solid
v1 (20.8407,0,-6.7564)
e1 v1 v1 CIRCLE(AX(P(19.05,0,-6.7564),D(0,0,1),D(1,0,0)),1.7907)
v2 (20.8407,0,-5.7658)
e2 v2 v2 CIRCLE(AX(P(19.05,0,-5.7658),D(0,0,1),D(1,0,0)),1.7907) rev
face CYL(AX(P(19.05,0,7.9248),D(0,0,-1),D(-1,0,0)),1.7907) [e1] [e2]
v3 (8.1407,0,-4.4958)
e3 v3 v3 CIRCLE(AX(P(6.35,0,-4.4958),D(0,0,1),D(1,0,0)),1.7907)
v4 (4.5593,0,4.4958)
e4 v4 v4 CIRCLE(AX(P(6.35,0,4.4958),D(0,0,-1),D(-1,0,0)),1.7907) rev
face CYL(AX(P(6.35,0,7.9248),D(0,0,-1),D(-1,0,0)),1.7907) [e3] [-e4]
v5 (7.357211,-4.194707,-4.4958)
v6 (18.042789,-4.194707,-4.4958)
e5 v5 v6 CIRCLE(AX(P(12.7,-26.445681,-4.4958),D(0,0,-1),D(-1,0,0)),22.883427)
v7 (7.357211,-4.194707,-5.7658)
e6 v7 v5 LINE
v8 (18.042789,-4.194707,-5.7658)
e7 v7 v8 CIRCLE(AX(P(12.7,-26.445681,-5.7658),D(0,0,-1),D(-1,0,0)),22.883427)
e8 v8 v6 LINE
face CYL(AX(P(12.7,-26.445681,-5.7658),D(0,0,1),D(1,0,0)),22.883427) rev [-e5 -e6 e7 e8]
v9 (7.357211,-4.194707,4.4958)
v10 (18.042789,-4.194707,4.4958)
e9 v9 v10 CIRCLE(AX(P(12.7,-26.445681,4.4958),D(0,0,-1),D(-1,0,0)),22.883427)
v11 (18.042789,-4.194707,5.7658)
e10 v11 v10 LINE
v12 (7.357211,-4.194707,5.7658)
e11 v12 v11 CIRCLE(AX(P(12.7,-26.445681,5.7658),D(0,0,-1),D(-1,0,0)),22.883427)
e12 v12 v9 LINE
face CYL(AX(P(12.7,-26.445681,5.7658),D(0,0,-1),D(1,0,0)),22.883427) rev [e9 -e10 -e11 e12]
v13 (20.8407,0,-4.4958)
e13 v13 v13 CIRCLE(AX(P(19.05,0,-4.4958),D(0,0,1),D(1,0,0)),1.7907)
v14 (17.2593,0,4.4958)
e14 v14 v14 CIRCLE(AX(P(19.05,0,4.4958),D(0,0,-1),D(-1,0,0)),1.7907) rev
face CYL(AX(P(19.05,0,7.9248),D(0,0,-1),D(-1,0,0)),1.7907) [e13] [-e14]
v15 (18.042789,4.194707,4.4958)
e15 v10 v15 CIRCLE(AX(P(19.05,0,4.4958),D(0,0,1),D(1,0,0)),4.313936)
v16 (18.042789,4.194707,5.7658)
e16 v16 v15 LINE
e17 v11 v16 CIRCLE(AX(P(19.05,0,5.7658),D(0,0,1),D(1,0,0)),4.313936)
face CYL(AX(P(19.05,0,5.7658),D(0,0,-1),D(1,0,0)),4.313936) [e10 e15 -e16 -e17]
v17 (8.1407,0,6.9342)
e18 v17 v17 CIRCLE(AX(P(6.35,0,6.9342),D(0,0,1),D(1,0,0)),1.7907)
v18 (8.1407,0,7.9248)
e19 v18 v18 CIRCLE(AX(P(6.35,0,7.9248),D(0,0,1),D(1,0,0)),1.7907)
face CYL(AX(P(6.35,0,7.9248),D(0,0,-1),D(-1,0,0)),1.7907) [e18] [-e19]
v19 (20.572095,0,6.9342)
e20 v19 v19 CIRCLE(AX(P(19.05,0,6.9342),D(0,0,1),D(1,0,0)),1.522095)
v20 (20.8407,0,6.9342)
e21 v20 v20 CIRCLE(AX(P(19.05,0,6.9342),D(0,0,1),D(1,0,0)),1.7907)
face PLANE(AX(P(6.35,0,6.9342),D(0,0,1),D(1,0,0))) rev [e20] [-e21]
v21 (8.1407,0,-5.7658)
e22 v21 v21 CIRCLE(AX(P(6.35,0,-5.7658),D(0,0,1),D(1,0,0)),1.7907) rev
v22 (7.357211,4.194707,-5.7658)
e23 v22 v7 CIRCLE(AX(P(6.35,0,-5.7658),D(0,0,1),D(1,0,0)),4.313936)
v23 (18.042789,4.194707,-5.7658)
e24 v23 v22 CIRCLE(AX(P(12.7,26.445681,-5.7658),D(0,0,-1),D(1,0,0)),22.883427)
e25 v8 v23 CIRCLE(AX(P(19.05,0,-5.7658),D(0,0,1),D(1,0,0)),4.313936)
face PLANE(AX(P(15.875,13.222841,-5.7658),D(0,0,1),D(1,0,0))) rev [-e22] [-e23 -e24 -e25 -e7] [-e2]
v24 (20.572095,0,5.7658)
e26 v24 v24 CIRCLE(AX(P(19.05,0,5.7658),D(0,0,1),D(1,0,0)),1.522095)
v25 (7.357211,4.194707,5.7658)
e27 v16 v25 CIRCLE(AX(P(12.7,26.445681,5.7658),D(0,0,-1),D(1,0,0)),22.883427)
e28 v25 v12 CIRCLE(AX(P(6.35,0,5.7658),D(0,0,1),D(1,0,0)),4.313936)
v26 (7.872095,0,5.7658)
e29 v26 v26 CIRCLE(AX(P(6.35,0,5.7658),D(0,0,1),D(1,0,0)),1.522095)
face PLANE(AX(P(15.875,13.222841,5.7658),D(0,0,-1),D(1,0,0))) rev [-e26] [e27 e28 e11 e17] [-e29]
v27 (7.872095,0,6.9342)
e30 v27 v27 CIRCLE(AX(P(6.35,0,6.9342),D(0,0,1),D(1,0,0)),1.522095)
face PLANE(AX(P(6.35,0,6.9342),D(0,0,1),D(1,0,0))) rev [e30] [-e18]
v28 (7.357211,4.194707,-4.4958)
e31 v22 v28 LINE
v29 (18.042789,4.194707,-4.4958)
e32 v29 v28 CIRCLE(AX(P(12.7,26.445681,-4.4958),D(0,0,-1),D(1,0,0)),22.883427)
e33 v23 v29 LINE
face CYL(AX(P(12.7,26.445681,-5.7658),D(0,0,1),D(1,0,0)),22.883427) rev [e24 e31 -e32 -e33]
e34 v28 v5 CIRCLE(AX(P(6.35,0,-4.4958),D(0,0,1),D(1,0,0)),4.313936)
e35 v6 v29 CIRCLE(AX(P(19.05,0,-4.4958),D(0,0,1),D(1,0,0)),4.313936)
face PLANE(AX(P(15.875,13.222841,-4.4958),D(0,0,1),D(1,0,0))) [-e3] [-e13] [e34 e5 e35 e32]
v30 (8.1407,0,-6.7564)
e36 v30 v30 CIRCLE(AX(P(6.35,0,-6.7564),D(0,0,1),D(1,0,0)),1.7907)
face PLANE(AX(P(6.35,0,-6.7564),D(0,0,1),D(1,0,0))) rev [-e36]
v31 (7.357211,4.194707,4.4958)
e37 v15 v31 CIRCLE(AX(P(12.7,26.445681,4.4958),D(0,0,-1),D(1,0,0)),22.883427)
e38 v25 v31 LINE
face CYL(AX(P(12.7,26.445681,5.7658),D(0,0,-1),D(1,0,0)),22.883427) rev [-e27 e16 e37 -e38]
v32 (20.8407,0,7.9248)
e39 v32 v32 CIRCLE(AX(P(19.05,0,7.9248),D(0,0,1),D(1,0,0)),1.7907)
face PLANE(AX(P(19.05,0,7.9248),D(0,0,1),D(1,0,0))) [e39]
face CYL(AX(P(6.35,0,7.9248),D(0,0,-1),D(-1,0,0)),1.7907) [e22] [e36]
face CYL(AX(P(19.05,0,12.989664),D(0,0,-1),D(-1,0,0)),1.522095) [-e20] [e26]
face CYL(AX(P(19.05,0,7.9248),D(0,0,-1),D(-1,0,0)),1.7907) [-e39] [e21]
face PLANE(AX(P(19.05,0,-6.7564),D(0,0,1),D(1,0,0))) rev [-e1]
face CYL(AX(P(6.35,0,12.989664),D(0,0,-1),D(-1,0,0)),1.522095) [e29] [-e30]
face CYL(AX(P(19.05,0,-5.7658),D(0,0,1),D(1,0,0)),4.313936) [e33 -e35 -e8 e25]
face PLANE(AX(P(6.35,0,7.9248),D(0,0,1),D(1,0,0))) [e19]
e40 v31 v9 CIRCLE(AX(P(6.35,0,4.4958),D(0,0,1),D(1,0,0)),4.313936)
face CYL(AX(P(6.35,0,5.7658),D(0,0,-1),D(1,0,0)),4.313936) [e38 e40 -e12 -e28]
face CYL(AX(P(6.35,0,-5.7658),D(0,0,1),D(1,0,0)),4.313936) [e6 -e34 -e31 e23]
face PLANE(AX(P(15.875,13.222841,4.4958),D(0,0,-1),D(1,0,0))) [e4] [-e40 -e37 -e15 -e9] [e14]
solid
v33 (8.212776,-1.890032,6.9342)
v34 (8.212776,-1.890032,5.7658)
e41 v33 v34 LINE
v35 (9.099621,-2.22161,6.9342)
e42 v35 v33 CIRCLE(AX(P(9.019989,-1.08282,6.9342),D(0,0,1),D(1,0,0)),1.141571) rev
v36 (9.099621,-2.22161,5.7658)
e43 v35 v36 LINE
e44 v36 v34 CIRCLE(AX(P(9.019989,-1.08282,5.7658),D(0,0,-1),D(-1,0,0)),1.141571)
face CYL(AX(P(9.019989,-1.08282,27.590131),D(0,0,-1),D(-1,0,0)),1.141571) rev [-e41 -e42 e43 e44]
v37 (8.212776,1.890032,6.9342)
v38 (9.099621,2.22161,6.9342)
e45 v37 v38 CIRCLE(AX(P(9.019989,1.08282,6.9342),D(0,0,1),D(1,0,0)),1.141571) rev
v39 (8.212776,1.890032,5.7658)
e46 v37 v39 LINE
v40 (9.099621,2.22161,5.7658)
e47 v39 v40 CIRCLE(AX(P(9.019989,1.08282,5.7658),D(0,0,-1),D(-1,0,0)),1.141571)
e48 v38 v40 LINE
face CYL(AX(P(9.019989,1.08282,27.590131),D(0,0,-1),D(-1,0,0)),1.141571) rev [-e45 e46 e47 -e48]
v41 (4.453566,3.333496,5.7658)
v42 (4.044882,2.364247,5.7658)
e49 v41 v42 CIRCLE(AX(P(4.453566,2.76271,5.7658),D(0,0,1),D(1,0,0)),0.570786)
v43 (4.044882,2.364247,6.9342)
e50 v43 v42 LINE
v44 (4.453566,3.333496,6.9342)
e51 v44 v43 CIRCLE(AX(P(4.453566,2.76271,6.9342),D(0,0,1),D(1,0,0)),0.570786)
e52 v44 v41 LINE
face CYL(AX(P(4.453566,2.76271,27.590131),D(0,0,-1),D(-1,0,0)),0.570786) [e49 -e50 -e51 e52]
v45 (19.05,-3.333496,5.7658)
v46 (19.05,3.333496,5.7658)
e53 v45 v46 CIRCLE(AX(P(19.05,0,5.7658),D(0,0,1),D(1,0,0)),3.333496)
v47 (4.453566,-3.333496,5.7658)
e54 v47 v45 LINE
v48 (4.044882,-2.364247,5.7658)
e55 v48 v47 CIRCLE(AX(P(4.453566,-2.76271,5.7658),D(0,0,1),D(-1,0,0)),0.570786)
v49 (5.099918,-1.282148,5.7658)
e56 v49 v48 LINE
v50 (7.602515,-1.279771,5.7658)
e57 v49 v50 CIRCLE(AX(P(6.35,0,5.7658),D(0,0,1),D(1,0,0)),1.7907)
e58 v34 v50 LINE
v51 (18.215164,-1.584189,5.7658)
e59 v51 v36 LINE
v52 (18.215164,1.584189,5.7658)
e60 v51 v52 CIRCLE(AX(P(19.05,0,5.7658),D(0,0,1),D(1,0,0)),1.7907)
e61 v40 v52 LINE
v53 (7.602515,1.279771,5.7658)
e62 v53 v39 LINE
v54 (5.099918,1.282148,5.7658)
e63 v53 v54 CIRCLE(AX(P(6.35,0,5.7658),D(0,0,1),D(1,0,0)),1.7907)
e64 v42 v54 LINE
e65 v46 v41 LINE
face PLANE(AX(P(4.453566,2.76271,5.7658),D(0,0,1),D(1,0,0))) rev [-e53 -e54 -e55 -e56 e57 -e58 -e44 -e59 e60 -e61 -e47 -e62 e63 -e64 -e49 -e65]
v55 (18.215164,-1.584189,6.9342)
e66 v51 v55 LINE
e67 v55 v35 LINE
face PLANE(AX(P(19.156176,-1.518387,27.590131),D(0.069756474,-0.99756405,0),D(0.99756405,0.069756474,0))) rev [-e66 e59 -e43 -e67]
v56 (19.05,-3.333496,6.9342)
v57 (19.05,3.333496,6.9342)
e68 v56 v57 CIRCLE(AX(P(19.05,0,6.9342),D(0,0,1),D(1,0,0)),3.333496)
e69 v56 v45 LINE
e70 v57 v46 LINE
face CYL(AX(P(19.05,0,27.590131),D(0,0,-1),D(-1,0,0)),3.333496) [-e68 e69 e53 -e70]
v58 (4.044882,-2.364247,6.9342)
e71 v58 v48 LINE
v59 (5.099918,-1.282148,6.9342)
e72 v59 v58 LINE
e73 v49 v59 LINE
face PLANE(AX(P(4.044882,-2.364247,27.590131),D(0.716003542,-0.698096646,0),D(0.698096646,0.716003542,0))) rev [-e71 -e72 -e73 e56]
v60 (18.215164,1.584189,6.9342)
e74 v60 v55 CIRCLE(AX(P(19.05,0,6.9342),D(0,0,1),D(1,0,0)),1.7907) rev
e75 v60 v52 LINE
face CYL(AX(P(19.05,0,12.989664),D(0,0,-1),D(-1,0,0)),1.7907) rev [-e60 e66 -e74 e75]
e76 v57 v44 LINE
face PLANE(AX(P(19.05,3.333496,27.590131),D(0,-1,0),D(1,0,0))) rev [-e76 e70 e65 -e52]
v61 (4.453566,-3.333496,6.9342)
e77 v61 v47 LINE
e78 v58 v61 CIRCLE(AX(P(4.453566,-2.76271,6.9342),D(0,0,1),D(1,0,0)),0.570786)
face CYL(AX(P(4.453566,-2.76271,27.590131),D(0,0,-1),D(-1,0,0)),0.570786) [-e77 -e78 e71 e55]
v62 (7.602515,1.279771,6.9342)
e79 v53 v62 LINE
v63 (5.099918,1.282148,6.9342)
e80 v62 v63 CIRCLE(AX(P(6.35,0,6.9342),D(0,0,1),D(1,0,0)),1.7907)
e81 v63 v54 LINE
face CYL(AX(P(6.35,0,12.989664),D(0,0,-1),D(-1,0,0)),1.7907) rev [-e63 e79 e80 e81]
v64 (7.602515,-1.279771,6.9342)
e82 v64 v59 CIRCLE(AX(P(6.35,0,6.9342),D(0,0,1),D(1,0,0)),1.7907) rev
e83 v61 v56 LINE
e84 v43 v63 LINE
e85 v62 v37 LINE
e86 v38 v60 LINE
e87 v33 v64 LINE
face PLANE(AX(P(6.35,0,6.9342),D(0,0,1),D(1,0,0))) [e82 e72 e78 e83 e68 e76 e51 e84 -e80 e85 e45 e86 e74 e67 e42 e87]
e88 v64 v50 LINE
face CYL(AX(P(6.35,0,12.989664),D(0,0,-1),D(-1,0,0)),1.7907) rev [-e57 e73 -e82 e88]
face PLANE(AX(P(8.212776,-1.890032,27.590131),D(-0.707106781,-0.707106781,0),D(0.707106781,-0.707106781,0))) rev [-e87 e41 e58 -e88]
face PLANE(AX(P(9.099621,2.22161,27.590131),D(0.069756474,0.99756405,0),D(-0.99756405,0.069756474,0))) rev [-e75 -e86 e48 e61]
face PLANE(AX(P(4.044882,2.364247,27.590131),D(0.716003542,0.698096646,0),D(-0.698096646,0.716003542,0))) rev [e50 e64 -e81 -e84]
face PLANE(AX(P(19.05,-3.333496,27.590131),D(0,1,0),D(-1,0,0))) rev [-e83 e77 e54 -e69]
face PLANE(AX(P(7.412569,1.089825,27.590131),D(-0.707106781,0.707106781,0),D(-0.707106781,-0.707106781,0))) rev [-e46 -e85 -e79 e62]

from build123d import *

# Parameters (mm, degrees)
SKETCH4_R                  = 3.8862
SKETCH4_R_2                = 1.8161
BOSS_EXTRUDE1_DEPTH        = 3.175
SKETCH5_R                  = 1.7907
BOSS_EXTRUDE2_DEPTH        = 1.27
LPATTERN1_COUNT            = 2
LPATTERN1_PITCH            = 12.7
SKETCH7_R                  = 1.7907
BOSS_EXTRUDE3_DEPTH        = 1.27
MIRROR1_START              = 4.4958
MIRROR1_OUTLINE_R          = 1.7907
MIRROR1_DEPTH              = 1.27
BOSS_EXTRUDE4_DEPTH        = 7.9248
BOSS_EXTRUDE4_DEPTH_BACK   = 6.7564
SKETCH8_R                  = 1.7907
BOSS_EXTRUDE4_2_DEPTH      = 7.9248
BOSS_EXTRUDE4_2_DEPTH_BACK = 6.7564
BOSS_EXTRUDE5_DEPTH        = 1.1684
SKETCH12_R                 = 1.7907
SKETCH12_R_2               = 1.522095
CUT_EXTRUDE1_DEPTH         = 1.1684


# Read off the part's stored shape, not the designer's step: Mirror1
with BuildPart() as part:
    # Sketch4 → Boss-Extrude1 (new, symmetric)
    with BuildSketch(Plane.XY):
        with Locations((6.35, 0)):
            Circle(SKETCH4_R)
        with Locations((6.35, 0)):
            Circle(SKETCH4_R_2, mode=Mode.SUBTRACT)
    extrude(amount=BOSS_EXTRUDE1_DEPTH, both=True)


with BuildPart() as body_2:
    # Sketch5 → Boss-Extrude2 (new body)
    with BuildSketch(Plane.XY.offset(3.175)):
        with BuildLine():
            ThreePointArc((-5.229673653, 4.772466209), (-11.2522, 0), (-5.229673653, -4.772466209))
            ThreePointArc((-5.229673653, -4.772466209), (0, -4.16687), (5.229673653, -4.772466209))
            ThreePointArc((5.229673653, -4.772466209), (11.2522, 0), (5.229673653, 4.772466209))
            ThreePointArc((5.229673653, 4.772466209), (0, 4.16687), (-5.229673653, 4.772466209))
        make_face()
        with Locations((-6.35, 0)):
            Circle(SKETCH5_R, mode=Mode.SUBTRACT)
        with Locations((6.35, 0)):
            Circle(SKETCH5_R, mode=Mode.SUBTRACT)
    extrude(amount=BOSS_EXTRUDE2_DEPTH)


with BuildPart() as lpattern1_1:
    # LPattern1: pattern copy
    add(part.part.moved(Location(Vector(1, 0, 0) * (1 * LPATTERN1_PITCH))))


with BuildPart() as body_4:
    # Sketch7 → Boss-Extrude3 (new body)
    with BuildSketch(Plane.XY.offset(-4.4958)):
        with BuildLine():
            ThreePointArc((7.357211383, 4.194707265), (2.036064, 0), (7.357211383, -4.194707265))
            ThreePointArc((7.357211383, -4.194707265), (12.7, -3.562254201), (18.042788617, -4.194707265))
            ThreePointArc((18.042788617, -4.194707265), (23.363936, 0), (18.042788617, 4.194707265))
            ThreePointArc((18.042788617, 4.194707265), (12.7, 3.562254201), (7.357211383, 4.194707265))
        make_face()
        with Locations((6.35, 0)):
            Circle(SKETCH7_R, mode=Mode.SUBTRACT)
        with Locations((19.05, 0)):
            Circle(SKETCH7_R, mode=Mode.SUBTRACT)
    extrude(amount=-BOSS_EXTRUDE3_DEPTH)


with BuildPart() as body_5:
    # Mirror1 outline → Mirror1 (new body)
    with BuildSketch(Plane.XY.offset(MIRROR1_START)):
        with BuildLine():
            ThreePointArc((18.042788617, -4.194707265), (23.363936, 0), (18.042788617, 4.194707265))
            ThreePointArc((18.042788617, 4.194707265), (12.7, 3.562254201), (7.357211383, 4.194707265))
            ThreePointArc((7.357211383, 4.194707265), (2.036064, 0), (7.357211383, -4.194707265))
            ThreePointArc((7.357211383, -4.194707265), (12.7, -3.562254201), (18.042788617, -4.194707265))
        make_face()
        with Locations((6.35, 0)):
            Circle(MIRROR1_OUTLINE_R, mode=Mode.SUBTRACT)
        with Locations((19.05, 0)):
            Circle(MIRROR1_OUTLINE_R, mode=Mode.SUBTRACT)
    extrude(amount=MIRROR1_DEPTH)


with BuildPart() as body_3:
    # Sketch8 → Boss-Extrude4 (new, two sides: drawn at the far end of the back side and taken through both)
    with BuildSketch(Plane.XY.offset(-BOSS_EXTRUDE4_DEPTH_BACK)):
        with Locations((6.35, 0)):
            Circle(SKETCH8_R)
    extrude(amount=BOSS_EXTRUDE4_DEPTH + BOSS_EXTRUDE4_DEPTH_BACK)


with BuildPart() as body_4_2:
    # Sketch8 → Boss-Extrude4 2 (new, two sides: drawn at the far end of the back side and taken through both)
    with BuildSketch(Plane.XY.offset(-BOSS_EXTRUDE4_2_DEPTH_BACK)):
        with Locations((19.05, 0)):
            Circle(SKETCH8_R)
    extrude(amount=BOSS_EXTRUDE4_2_DEPTH + BOSS_EXTRUDE4_2_DEPTH_BACK)


with BuildPart() as body_5_2:
    # Sketch10 → Boss-Extrude5 (new body)
    with BuildSketch(Plane.XY.offset(5.7658)):
        with BuildLine():
            Line((19.05, -3.333496), (4.453566335, -3.333496))
            ThreePointArc((4.453566335, -3.333496), (3.927622666, -2.984474861), (4.044881806, -2.364246845))
            Line((4.044881806, -2.364246845), (5.287430585, -1.089825412))
            ThreePointArc((5.287430585, -1.089825412), (6.35, -1.522095), (7.412569415, -1.089825412))
            Line((7.412569415, -1.089825412), (8.212776406, -1.890032403))
            ThreePointArc((8.212776406, -1.890032403), (8.6202025, -2.152097673), (9.099621163, -2.221610071))
            Line((9.099621163, -2.221610071), (19.15617598, -1.518387253))
            ThreePointArc((19.15617598, -1.518387253), (20.572095, 0), (19.15617598, 1.518387253))
            Line((19.15617598, 1.518387253), (9.099621163, 2.221610071))
            ThreePointArc((9.099621163, 2.221610071), (8.6202025, 2.152097673), (8.212776406, 1.890032403))
            Line((8.212776406, 1.890032403), (7.412569415, 1.089825412))
            ThreePointArc((7.412569415, 1.089825412), (6.35, 1.522095), (5.287430585, 1.089825412))
            Line((5.287430585, 1.089825412), (4.044881806, 2.364246845))
            ThreePointArc((4.044881806, 2.364246845), (3.927622666, 2.984474861), (4.453566335, 3.333496))
            Line((4.453566335, 3.333496), (19.05, 3.333496))
            ThreePointArc((19.05, 3.333496), (22.383496, 0), (19.05, -3.333496))
        make_face()
    extrude(amount=BOSS_EXTRUDE5_DEPTH)


with BuildPart() as cut_extrude1_tool:
    # Sketch12 → Cut-Extrude1 (new body)
    # profile 1 of 2: a face of its own
    with BuildSketch(Plane.XY.offset(5.7658)):
        with Locations((6.35, 0)):
            Circle(SKETCH12_R)
        with Locations((6.35, 0)):
            Circle(SKETCH12_R_2, mode=Mode.SUBTRACT)
    # profile 2 of 2: a face of its own
    with BuildSketch(Plane.XY.offset(5.7658)):
        with Locations((19.05, 0)):
            Circle(SKETCH12_R)
        with Locations((19.05, 0)):
            Circle(SKETCH12_R_2, mode=Mode.SUBTRACT)
    extrude(amount=CUT_EXTRUDE1_DEPTH)


with BuildPart() as body_3_1:
    add(body_3.part)

    # Cut-Extrude1: cut by cut_extrude1_tool
    add(cut_extrude1_tool.part, mode=Mode.SUBTRACT)


with BuildPart() as body_4_2_1:
    add(body_4_2.part)

    # Cut-Extrude1: cut by cut_extrude1_tool
    add(cut_extrude1_tool.part, mode=Mode.SUBTRACT)


with BuildPart() as body_5_2_1:
    add(body_5_2.part)

    # Cut-Extrude1: cut by cut_extrude1_tool
    add(cut_extrude1_tool.part, mode=Mode.SUBTRACT)


with BuildPart() as body_4_1:
    add(body_4.part)

    # Combine3: union body 5, body 4 2, body 3
    add(body_5.part)
    add(body_4_2_1.part)
    add(body_3_1.part)


solid = Compound([body_5_2_1.part, body_4_1.part])
